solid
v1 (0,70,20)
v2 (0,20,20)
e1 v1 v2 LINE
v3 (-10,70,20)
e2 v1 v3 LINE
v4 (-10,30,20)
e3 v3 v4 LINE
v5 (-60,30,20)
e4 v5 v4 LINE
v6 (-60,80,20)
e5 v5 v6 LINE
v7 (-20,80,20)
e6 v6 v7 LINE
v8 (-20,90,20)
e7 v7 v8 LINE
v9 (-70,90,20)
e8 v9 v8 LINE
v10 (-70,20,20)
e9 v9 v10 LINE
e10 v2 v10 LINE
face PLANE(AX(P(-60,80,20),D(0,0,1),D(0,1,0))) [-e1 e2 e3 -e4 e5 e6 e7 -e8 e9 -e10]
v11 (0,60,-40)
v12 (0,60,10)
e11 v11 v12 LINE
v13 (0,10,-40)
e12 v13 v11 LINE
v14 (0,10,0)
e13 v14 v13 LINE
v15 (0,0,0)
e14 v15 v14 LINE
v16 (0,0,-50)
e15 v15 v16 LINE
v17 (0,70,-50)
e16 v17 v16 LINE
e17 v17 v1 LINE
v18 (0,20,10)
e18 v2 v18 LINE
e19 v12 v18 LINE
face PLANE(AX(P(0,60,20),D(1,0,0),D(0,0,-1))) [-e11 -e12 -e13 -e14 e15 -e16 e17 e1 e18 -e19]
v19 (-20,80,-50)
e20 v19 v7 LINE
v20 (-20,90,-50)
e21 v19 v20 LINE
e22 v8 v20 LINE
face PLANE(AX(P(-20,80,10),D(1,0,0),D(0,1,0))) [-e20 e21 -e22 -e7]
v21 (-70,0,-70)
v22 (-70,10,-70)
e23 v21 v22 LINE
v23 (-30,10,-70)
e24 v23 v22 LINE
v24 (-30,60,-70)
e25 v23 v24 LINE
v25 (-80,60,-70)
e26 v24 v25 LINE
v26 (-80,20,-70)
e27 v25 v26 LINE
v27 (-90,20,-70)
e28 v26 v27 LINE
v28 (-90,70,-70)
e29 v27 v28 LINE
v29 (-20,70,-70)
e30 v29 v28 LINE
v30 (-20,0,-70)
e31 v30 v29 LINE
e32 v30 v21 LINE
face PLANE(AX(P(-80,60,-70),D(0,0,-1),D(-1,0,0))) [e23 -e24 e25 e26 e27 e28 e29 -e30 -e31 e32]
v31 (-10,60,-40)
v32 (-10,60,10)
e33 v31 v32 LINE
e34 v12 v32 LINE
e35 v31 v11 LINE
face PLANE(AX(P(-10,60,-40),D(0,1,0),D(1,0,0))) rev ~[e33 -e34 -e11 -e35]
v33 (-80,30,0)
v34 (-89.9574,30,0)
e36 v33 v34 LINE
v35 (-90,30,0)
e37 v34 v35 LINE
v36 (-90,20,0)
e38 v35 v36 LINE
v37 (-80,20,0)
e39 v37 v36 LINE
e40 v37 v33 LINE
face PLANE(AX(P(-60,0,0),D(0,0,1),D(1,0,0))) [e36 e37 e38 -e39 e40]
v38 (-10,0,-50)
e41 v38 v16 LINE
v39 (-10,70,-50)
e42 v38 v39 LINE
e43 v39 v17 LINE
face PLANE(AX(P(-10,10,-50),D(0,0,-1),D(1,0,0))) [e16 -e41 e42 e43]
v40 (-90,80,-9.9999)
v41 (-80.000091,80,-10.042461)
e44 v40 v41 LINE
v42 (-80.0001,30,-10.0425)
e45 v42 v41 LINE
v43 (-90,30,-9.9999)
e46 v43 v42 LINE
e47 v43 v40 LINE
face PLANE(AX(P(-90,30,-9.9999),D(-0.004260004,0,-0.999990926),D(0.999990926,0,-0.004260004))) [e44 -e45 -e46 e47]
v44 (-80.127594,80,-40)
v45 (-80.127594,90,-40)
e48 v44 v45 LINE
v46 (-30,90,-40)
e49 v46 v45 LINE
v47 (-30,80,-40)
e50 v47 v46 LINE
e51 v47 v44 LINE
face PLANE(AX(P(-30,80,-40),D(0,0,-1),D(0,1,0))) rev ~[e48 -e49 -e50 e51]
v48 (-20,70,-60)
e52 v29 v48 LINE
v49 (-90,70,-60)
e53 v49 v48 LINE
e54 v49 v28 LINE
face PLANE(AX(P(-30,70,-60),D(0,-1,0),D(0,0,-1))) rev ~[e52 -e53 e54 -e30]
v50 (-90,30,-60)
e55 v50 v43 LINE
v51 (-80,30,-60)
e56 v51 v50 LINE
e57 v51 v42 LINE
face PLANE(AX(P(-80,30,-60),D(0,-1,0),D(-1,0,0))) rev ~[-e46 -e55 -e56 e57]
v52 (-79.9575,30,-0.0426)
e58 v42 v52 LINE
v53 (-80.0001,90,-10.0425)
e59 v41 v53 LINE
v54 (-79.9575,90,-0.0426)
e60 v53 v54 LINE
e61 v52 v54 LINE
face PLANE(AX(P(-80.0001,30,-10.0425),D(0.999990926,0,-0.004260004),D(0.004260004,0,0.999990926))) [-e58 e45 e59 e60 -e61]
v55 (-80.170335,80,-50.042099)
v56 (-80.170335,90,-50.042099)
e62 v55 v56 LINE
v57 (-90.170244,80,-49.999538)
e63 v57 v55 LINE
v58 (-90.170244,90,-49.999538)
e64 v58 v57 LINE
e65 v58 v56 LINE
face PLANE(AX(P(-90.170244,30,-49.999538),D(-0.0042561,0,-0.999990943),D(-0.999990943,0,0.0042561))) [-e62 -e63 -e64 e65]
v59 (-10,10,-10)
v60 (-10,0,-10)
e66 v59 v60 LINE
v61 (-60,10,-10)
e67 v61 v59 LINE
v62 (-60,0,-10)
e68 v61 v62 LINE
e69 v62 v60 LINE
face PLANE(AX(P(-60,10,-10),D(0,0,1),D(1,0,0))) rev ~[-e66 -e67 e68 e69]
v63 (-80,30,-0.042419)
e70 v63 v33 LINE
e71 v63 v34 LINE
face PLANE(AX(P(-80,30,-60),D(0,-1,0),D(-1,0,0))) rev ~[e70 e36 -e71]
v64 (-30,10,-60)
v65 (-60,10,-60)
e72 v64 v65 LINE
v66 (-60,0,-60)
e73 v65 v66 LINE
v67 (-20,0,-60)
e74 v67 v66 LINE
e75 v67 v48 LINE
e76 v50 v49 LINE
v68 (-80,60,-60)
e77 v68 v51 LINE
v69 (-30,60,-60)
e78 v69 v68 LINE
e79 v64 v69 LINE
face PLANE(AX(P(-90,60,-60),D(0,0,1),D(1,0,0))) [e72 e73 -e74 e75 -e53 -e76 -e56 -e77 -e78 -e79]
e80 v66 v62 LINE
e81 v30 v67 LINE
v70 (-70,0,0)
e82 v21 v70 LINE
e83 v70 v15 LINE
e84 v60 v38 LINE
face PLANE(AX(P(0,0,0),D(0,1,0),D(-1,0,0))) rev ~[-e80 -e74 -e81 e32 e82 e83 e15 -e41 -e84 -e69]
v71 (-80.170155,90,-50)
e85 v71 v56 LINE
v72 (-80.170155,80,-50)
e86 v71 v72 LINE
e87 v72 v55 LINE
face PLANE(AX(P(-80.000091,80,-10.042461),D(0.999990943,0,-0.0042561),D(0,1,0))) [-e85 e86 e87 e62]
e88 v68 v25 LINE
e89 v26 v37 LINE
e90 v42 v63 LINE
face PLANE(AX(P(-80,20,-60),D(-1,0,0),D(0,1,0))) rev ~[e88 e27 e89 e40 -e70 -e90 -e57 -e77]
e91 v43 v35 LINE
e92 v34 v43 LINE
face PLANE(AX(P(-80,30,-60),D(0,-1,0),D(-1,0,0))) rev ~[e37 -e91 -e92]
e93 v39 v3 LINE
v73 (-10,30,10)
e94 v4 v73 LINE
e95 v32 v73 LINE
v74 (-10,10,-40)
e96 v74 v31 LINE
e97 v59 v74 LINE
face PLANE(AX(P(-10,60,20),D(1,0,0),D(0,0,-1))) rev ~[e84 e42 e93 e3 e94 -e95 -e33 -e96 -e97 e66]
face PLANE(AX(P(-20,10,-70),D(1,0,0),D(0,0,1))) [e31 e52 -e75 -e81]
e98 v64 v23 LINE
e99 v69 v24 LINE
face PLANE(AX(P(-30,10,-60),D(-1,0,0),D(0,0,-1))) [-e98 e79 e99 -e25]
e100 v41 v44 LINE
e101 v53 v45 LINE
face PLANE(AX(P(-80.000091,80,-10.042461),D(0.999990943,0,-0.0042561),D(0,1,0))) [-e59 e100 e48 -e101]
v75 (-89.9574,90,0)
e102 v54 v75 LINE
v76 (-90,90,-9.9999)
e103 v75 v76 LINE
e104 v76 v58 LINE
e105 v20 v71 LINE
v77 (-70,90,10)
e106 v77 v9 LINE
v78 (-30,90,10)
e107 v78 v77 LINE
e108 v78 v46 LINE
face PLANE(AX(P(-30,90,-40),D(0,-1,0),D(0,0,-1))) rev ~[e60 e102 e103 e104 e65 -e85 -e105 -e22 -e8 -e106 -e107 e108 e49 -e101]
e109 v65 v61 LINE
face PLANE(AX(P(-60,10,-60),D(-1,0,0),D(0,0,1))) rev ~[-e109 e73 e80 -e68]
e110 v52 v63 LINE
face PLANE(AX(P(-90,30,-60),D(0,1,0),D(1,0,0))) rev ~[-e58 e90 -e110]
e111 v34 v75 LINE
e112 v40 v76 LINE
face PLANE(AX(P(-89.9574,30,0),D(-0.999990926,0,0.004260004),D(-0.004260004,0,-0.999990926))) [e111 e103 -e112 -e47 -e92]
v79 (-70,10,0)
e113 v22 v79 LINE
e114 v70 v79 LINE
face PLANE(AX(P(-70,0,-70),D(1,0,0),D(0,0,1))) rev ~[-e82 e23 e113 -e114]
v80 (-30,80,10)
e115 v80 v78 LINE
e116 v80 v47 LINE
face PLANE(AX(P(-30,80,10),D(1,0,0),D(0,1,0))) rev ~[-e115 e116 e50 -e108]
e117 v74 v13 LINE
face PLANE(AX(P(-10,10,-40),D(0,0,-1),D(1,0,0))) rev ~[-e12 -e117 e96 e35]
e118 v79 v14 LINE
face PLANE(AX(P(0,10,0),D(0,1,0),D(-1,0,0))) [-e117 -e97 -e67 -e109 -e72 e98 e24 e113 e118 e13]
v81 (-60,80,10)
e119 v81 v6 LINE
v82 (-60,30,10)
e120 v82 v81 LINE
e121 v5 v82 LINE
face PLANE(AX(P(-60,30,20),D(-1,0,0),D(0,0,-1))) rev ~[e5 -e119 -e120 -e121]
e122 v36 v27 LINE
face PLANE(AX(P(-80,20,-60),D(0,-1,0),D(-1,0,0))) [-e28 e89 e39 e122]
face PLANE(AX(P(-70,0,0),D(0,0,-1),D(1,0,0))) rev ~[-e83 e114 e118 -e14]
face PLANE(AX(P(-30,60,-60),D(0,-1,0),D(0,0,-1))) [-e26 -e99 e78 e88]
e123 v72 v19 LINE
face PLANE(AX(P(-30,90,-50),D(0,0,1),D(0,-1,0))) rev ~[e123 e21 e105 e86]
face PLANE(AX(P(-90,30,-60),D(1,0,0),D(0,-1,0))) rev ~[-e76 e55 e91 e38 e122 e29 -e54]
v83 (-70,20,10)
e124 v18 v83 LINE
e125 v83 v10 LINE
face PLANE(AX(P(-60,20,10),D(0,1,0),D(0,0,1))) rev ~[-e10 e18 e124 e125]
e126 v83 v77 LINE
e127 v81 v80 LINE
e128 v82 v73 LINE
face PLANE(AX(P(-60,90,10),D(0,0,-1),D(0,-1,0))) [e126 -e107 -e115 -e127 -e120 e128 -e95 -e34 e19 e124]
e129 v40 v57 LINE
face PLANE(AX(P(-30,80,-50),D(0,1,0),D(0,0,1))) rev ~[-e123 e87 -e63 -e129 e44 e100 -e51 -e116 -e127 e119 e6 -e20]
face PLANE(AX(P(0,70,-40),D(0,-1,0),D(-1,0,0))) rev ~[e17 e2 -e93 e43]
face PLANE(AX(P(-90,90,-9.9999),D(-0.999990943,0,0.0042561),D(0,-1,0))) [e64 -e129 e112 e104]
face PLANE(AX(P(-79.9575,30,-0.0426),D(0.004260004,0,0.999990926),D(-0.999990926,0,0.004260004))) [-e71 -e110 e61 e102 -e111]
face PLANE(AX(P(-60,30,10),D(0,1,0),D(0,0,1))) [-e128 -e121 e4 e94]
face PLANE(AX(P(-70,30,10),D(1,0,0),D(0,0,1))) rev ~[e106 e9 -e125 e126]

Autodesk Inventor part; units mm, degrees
ref_plane "YZ Plane" through (0, 0, 0) normal (1, 0, 0) x (0, 1, 0)
ref_plane "XZ Plane" through (0, 0, 0) normal (0, 1, 0) x (-1, 0, 0)
ref_plane "XY Plane" through (0, 0, 0) normal (0, 0, 1) x (1, 0, 0)
sketch "Sketch1" plane through (0, 0, 0) normal (0, 1, 0) x (-1, 0, 0)
  line L0 (0, 0) -> (0, -70)
  line L1 (0, -70) -> (70, -70)
  line L2 (70, -70) -> (70, 0)
  line L3 (70, 0) -> (0, 0)
  dimension "d0" = 70
  dimension "d1" = 70
  dimension "d2" = 70
extrude "Extrusion1" add sketch "Sketch1" along normal blind 10
sketch "Sketch2" plane through (0, 10, 0) normal (0, 1, 0) x (1, 0, 0)
  line L0 (-10, 10) -> (-10, 60)
  line L1 (-10, 60) -> (-60, 60)
  line L2 (-60, 60) -> (-60, 10)
  line L3 (-60, 10) -> (-10, 10)
  point P0 (0, 0)
  dimension "d7" = 50
  dimension "d8" = 50
  dimension "d9" = 50
extrude "Extrusion2" cut sketch "Sketch2" against normal blind 10
sketch "Sketch3" plane through (0, 10, 0) normal (0, 1, 0) x (1, 0, 0)
  line L0 (0, 70) -> (-70, 70) projected
  line L1 (0, 70) -> (0, 60)
  line L2 (0, 0) -> (0, 70) projected
  line L3 (0, 60) -> (-10, 60)
  line L4 (-10, 60) -> (-10, 70)
  dimension "d12" = 10
  dimension "d13" = 10
  dimension "d14" = 10
extrude "Extrusion3" cut sketch "Sketch3" against normal blind 10
sketch "Sketch4" plane through (0, 10, 0) normal (0, 1, 0) x (1, 0, 0)
  line L0 (-10, 60) -> (-60, 60) projected
  line L1 (-10, 60) -> (-10, 50)
  line L2 (-10, 60) -> (-10, 10) projected
  line L3 (-10, 50) -> (0, 50)
  line L4 (0, 0) -> (0, 60) projected
  line L5 (0, 50) -> (0, 60)
  line L6 (-10, 60) -> (0, 60) projected
  line L7 (0, 60) -> (-10, 60)
  dimension "d17" = 10
  dimension "d18" = 10
  dimension "d19" = 10
  dimension "d20" = 10
extrude "Extrusion4" cut sketch "Sketch4" against normal blind 10
sketch "Sketch5" plane through (0, 10, 0) normal (0, 1, 0) x (1, 0, 0)
  line L0 (-10, 60) -> (-10, 70) projected
  line L1 (-10, 60) -> (-10, 70)
  line L2 (-10, 70) -> (-20, 70)
  line L3 (-10, 70) -> (-70, 70) projected
  line L4 (-20, 70) -> (-20, 60)
  line L5 (-60, 60) -> (-10, 60) projected
  line L6 (-20, 60) -> (-10, 60)
  point P0 (0, 0)
  dimension "d23" = 10
  dimension "d24" = 10
  dimension "d25" = 10
  dimension "d26" = 10
extrude "Extrusion5" cut sketch "Sketch5" against normal blind 10
sketch "Sketch6" plane through (0, 10, 0) normal (0, 1, 0) x (1, 0, 0)
  line L0 (-10, 50) -> (0, 50) projected
  line L1 (-10, 50) -> (-10, 40)
  line L2 (-10, 40) -> (0, 40)
  line L3 (0, 0) -> (0, 50) projected
  line L4 (0, 40) -> (0, 50)
  line L5 (0, 50) -> (-10, 50)
  dimension "d29" = 10
  dimension "d30" = 10
  dimension "d31" = 10
  dimension "d32" = 10
extrude "Extrusion6" add sketch "Sketch6" along normal blind 70
sketch "Sketch7" plane through (0, 10, 0) normal (0, 1, 0) x (1, 0, 0)
  line L0 (-20, 60) -> (-30, 60)
  line L1 (-60, 60) -> (-20, 60) projected
  line L2 (-30, 60) -> (-30, 70)
  line L3 (-20, 70) -> (-70, 70) projected
  line L4 (-30, 70) -> (-20, 70)
  line L5 (-20, 70) -> (-20, 60)
  point P0 (0, 0)
  dimension "d35" = 10
  dimension "d36" = 10
  dimension "d37" = 10
  dimension "d38" = 10
extrude "Extrusion7" add sketch "Sketch7" along normal blind 60
sketch "Sketch8" plane through (0, 80, 0) normal (0, 1, 0) x (1, 0, 0)
  line L0 (0, 40) -> (-10, 40) projected
  line L1 (0, 40) -> (0, 50)
  line L2 (-10, 50) -> (0, 50) projected
  line L3 (0, 50) -> (-10, 50)
  line L4 (-10, 50) -> (-10, 40)
  line L5 (-10, 40) -> (0, 40)
  point P0 (0, 0)
  dimension "d41" = 10
  dimension "d42" = 10
  dimension "d43" = 10
  dimension "d44" = 10
extrude "Extrusion8" cut sketch "Sketch8" against normal blind 10
sketch "Sketch9" plane through (-10, 10, -40) normal (0, 0, 1) x (1, 0, 0)
  line L0 (10, 60) -> (0, 60) projected
  line L1 (0, 60) -> (0, 50)
  line L2 (0, 60) -> (0, -10) projected
  line L3 (0, 50) -> (10, 50)
  line L4 (10, -10) -> (10, 60) projected
  line L5 (10, 50) -> (10, 60)
  line L6 (10, 60) -> (0, 60)
  dimension "d47" = 10
  dimension "d48" = 10
  dimension "d49" = 10
  dimension "d50" = 10
extrude "Extrusion9" add sketch "Sketch9" along normal blind 60
sketch "Sketch10" plane through (-10, 60, -40) normal (0, -1, 0) x (1, 0, 0)
  line L0 (10, 60) -> (0, 60) projected
  line L1 (0, 60) -> (10, 60)
  line L2 (10, 60) -> (10, 50)
  line L3 (10, -10) -> (10, 60) projected
  line L4 (10, 50) -> (0, 50)
  line L5 (0, 60) -> (0, -10) projected
  line L6 (0, 50) -> (0, 60)
  point P0 (10, 40)
  dimension "d53" = 10
  dimension "d54" = 10
  dimension "d55" = 10
  dimension "d56" = 10
extrude "Extrusion10" add sketch "Sketch10" along normal blind 40
sketch "Sketch11" plane through (-10, 0, -10) normal (-1, 0, 0) x (0, 0, 1)
  line L0 (20, 20) -> (30, 20) projected
  line L1 (20, 20) -> (30, 20)
  line L2 (30, 20) -> (30, 30)
  line L3 (30, 70) -> (30, 20) projected
  line L4 (30, 30) -> (20, 30)
  line L5 (20, 60) -> (20, 20) projected
  line L6 (20, 30) -> (20, 20)
  point P0 (10, 0)
  dimension "d59" = 10
  dimension "d60" = 10
  dimension "d61" = 10
  dimension "d62" = 10
extrude "Extrusion11" add sketch "Sketch11" along normal blind 50
sketch "Sketch12" plane through (-30, 10, -70) normal (-1, 0, 0) x (0, 0, 1)
  line L0 (0, 60) -> (0, -10) projected
  line L1 (10, 60) -> (0, 60) projected
  line L2 (0, 60) -> (10, 60)
  line L3 (10, 60) -> (10, 50)
  line L4 (10, -10) -> (10, 60) projected
  line L5 (10, 50) -> (0, 50)
  line L6 (0, 50) -> (0, 60)
  line L7 (0, 60) -> (0, 55)
  point P0 (70, -10)
  dimension "d65" = 10
  dimension "d66" = 10
  dimension "d67" = 10
  dimension "d68" = 10
extrude "Extrusion12" add sketch "Sketch12" along normal blind 60
sketch "Sketch13" plane through (-90, 10, -70) normal (-1, 0, 0) x (0, 0, 1)
  point P0 (70, -10)
sketch "Sketch14" plane through (-30, 60, -70) normal (0, -1, 0) x (1, 0, 0)
  line L0 (10, 0) -> (-60, 0) projected
  line L1 (-60, 0) -> (-60, 10) projected
  line L2 (-60, 0) -> (-60, 10)
  line L3 (-60, 10) -> (-50, 10)
  line L4 (10, 10) -> (-60, 10) projected
  line L5 (-50, 10) -> (-50, 0)
  line L6 (-50, 0) -> (-60, 0)
  point P0 (30, 70)
  dimension "d71" = 10
  dimension "d72" = 10
  dimension "d73" = 10
  dimension "d74" = 10
extrude "Extrusion13" add sketch "Sketch14" along normal blind 40
sketch "Sketch15" plane through (-60, 0, -60) normal (0, 0, 1) x (1, 0, 0)
  line L0 (-20, 20) -> (-30, 20) projected
  line L1 (-30, 20) -> (-20, 20)
  line L2 (-20, 20) -> (-20, 30)
  line L3 (-20, 60) -> (-20, 20) projected
  line L4 (-20, 30) -> (-30, 30)
  line L5 (-30, 70) -> (-30, 20) projected
  line L6 (-30, 30) -> (-30, 20)
  point P0 (60, 0)
  dimension "d77" = 10
  dimension "d78" = 10
  dimension "d79" = 10
  dimension "d80" = 10
extrude "Extrusion14" add sketch "Sketch15" along normal blind 60
sketch "Sketch16" plane through (-60, 0, -10) normal (-1, 0, 0) x (0, 0, 1)
  point P0 (10, 0)
sketch "Sketch17" plane through (-60, 0, -10) normal (-1, 0, 0) x (0, 0, 1)
  line L0 (20, 20) -> (30, 20) projected
  line L1 (30, 20) -> (20, 20)
  line L2 (20, 20) -> (20, 30)
  line L3 (20, 60) -> (20, 20) projected
  line L4 (20, 30) -> (30, 30)
  line L5 (30, 70) -> (30, 20) projected
  line L6 (30, 30) -> (30, 20)
  point P0 (10, 0)
  dimension "d83" = 10
  dimension "d84" = 10
  dimension "d85" = 10
  dimension "d86" = 10
extrude "Extrusion15" add sketch "Sketch17" along normal blind 10
sketch "Sketch18" plane through (-90, 30, -60) normal (0, 1, 0) x (1, 0, 0)
  line L0 (90, -70) -> (20, -70) projected
  line L1 (20, -70) -> (20, -80)
  line L2 (20, -80) -> (30, -80)
  line L3 (30, -80) -> (30, -70)
  line L4 (30, -70) -> (20, -70)
  point P0 (90, -60)
  dimension "d89" = 10
  dimension "d90" = 10
  dimension "d91" = 10
  dimension "d92" = 10
extrude "Extrusion16" add sketch "Sketch18" along normal blind 60
sketch "Sketch19" plane through (-60, 30, 10) normal (1, 0, 0) x (0, 0, -1)
  line L0 (-10, 60) -> (0, 60)
  line L1 (0, 60) -> (0, 50)
  line L2 (0, 50) -> (-10, 50)
  line L3 (-10, 0) -> (-10, 60) projected
  line L4 (-10, 50) -> (-10, 60)
  point P0 (10, -30)
  dimension "d95" = 10
  dimension "d96" = 10
  dimension "d97" = 10
  dimension "d98" = 10
extrude "Extrusion17" add sketch "Sketch19" along normal blind 40
sketch "Sketch20" plane through (-90, 30, -60) normal (0, 1, 0) x (1, 0, 0)
  line L0 (0.0426, -60) -> (0, -50.0001)
  line L1 (0, 0) -> (0, -60) projected
  line L2 (0, -50.0001) -> (9.9999, -49.9575)
  line L3 (9.9999, -49.9575) -> (10.0425, -59.9574)
  line L4 (10.0425, -59.9574) -> (0.0426, -60)
  point P0 (90, -60)
  dimension "d101" = 10
  dimension "d102" = 10
  dimension "d103" = 10
  dimension "d104" = 10
extrude "Extrusion18" add sketch "Sketch20" along normal blind 60
sketch "Sketch21" plane through (-90, 30, -9.9999) normal (-0.0042561, 0, -0.9999909) x (-0.9999909, 0, 0.0042561)
  point P0 (-89.9566, -30)
sketch "Sketch22" plane through (-90, 30, -9.9999) normal (-0.0042561, 0, -0.9999909) x (-0.9999909, 0, 0.0042561)
  line L0 (0, 60) -> (-10, 60) projected
  line L1 (-10, 60) -> (0, 60)
  line L2 (0, 60) -> (0, 50)
  line L3 (0, 0) -> (0, 60) projected
  line L4 (0, 50) -> (-10, 50)
  line L5 (-10, 0) -> (-10, 60) projected
  line L6 (-10, 50) -> (-10, 60)
  point P0 (-89.9566, -30)
  dimension "d107" = 10
  dimension "d108" = 10
  dimension "d109" = 10
  dimension "d110" = 10
extrude "Extrusion19" add sketch "Sketch22" along normal blind 40
sketch "Sketch23" plane through (0, 60, 10) normal (0, 0, -1) x (-1, 0, 0)
  line L0 (70, 30) -> (20, 30) projected
  line L1 (20, 20) -> (20, 30) projected
  line L2 (20, 30) -> (20, 20)
  line L3 (20, 20) -> (30, 20)
  line L4 (60, 20) -> (20, 20) projected
  line L5 (30, 20) -> (30, 30)
  line L6 (30, 30) -> (20, 30)
  point P0 (0, -60)
  dimension "d113" = 10
  dimension "d114" = 10
  dimension "d115" = 10
  dimension "d116" = 10
extrude "Extrusion20" add sketch "Sketch23" along normal blind 60
sketch "Sketch24" plane through (-79.9575, 30, -0.0426) normal (0.9999909, 0, -0.0042561) x (-0.0042561, 0, -0.9999909)
  point P0 (-0.3829, -30)
sketch "Sketch25" plane through (-30, 80, 10) normal (-1, 0, 0) x (0, 0, 1)
  point P0 (-10, -80)
sketch "Sketch26" plane through (-30, 80, 10) normal (-1, 0, 0) x (0, 0, 1)
  line L0 (0, 10) -> (-60, 10) projected
  line L1 (-60, 10) -> (-60, 0)
  line L2 (-60, 0) -> (-50, 0)
  line L3 (0, 0) -> (-60, 0) projected
  line L4 (-50, 0) -> (-50, 10)
  line L5 (-50, 10) -> (-60, 10)
  point P0 (-10, -80)
  dimension "d119" = 10
  dimension "d120" = 10
  dimension "d121" = 10
  dimension "d122" = 10
extrude "Extrusion21" add sketch "Sketch26" along normal blind 60
properties part number "WeirdCube"
